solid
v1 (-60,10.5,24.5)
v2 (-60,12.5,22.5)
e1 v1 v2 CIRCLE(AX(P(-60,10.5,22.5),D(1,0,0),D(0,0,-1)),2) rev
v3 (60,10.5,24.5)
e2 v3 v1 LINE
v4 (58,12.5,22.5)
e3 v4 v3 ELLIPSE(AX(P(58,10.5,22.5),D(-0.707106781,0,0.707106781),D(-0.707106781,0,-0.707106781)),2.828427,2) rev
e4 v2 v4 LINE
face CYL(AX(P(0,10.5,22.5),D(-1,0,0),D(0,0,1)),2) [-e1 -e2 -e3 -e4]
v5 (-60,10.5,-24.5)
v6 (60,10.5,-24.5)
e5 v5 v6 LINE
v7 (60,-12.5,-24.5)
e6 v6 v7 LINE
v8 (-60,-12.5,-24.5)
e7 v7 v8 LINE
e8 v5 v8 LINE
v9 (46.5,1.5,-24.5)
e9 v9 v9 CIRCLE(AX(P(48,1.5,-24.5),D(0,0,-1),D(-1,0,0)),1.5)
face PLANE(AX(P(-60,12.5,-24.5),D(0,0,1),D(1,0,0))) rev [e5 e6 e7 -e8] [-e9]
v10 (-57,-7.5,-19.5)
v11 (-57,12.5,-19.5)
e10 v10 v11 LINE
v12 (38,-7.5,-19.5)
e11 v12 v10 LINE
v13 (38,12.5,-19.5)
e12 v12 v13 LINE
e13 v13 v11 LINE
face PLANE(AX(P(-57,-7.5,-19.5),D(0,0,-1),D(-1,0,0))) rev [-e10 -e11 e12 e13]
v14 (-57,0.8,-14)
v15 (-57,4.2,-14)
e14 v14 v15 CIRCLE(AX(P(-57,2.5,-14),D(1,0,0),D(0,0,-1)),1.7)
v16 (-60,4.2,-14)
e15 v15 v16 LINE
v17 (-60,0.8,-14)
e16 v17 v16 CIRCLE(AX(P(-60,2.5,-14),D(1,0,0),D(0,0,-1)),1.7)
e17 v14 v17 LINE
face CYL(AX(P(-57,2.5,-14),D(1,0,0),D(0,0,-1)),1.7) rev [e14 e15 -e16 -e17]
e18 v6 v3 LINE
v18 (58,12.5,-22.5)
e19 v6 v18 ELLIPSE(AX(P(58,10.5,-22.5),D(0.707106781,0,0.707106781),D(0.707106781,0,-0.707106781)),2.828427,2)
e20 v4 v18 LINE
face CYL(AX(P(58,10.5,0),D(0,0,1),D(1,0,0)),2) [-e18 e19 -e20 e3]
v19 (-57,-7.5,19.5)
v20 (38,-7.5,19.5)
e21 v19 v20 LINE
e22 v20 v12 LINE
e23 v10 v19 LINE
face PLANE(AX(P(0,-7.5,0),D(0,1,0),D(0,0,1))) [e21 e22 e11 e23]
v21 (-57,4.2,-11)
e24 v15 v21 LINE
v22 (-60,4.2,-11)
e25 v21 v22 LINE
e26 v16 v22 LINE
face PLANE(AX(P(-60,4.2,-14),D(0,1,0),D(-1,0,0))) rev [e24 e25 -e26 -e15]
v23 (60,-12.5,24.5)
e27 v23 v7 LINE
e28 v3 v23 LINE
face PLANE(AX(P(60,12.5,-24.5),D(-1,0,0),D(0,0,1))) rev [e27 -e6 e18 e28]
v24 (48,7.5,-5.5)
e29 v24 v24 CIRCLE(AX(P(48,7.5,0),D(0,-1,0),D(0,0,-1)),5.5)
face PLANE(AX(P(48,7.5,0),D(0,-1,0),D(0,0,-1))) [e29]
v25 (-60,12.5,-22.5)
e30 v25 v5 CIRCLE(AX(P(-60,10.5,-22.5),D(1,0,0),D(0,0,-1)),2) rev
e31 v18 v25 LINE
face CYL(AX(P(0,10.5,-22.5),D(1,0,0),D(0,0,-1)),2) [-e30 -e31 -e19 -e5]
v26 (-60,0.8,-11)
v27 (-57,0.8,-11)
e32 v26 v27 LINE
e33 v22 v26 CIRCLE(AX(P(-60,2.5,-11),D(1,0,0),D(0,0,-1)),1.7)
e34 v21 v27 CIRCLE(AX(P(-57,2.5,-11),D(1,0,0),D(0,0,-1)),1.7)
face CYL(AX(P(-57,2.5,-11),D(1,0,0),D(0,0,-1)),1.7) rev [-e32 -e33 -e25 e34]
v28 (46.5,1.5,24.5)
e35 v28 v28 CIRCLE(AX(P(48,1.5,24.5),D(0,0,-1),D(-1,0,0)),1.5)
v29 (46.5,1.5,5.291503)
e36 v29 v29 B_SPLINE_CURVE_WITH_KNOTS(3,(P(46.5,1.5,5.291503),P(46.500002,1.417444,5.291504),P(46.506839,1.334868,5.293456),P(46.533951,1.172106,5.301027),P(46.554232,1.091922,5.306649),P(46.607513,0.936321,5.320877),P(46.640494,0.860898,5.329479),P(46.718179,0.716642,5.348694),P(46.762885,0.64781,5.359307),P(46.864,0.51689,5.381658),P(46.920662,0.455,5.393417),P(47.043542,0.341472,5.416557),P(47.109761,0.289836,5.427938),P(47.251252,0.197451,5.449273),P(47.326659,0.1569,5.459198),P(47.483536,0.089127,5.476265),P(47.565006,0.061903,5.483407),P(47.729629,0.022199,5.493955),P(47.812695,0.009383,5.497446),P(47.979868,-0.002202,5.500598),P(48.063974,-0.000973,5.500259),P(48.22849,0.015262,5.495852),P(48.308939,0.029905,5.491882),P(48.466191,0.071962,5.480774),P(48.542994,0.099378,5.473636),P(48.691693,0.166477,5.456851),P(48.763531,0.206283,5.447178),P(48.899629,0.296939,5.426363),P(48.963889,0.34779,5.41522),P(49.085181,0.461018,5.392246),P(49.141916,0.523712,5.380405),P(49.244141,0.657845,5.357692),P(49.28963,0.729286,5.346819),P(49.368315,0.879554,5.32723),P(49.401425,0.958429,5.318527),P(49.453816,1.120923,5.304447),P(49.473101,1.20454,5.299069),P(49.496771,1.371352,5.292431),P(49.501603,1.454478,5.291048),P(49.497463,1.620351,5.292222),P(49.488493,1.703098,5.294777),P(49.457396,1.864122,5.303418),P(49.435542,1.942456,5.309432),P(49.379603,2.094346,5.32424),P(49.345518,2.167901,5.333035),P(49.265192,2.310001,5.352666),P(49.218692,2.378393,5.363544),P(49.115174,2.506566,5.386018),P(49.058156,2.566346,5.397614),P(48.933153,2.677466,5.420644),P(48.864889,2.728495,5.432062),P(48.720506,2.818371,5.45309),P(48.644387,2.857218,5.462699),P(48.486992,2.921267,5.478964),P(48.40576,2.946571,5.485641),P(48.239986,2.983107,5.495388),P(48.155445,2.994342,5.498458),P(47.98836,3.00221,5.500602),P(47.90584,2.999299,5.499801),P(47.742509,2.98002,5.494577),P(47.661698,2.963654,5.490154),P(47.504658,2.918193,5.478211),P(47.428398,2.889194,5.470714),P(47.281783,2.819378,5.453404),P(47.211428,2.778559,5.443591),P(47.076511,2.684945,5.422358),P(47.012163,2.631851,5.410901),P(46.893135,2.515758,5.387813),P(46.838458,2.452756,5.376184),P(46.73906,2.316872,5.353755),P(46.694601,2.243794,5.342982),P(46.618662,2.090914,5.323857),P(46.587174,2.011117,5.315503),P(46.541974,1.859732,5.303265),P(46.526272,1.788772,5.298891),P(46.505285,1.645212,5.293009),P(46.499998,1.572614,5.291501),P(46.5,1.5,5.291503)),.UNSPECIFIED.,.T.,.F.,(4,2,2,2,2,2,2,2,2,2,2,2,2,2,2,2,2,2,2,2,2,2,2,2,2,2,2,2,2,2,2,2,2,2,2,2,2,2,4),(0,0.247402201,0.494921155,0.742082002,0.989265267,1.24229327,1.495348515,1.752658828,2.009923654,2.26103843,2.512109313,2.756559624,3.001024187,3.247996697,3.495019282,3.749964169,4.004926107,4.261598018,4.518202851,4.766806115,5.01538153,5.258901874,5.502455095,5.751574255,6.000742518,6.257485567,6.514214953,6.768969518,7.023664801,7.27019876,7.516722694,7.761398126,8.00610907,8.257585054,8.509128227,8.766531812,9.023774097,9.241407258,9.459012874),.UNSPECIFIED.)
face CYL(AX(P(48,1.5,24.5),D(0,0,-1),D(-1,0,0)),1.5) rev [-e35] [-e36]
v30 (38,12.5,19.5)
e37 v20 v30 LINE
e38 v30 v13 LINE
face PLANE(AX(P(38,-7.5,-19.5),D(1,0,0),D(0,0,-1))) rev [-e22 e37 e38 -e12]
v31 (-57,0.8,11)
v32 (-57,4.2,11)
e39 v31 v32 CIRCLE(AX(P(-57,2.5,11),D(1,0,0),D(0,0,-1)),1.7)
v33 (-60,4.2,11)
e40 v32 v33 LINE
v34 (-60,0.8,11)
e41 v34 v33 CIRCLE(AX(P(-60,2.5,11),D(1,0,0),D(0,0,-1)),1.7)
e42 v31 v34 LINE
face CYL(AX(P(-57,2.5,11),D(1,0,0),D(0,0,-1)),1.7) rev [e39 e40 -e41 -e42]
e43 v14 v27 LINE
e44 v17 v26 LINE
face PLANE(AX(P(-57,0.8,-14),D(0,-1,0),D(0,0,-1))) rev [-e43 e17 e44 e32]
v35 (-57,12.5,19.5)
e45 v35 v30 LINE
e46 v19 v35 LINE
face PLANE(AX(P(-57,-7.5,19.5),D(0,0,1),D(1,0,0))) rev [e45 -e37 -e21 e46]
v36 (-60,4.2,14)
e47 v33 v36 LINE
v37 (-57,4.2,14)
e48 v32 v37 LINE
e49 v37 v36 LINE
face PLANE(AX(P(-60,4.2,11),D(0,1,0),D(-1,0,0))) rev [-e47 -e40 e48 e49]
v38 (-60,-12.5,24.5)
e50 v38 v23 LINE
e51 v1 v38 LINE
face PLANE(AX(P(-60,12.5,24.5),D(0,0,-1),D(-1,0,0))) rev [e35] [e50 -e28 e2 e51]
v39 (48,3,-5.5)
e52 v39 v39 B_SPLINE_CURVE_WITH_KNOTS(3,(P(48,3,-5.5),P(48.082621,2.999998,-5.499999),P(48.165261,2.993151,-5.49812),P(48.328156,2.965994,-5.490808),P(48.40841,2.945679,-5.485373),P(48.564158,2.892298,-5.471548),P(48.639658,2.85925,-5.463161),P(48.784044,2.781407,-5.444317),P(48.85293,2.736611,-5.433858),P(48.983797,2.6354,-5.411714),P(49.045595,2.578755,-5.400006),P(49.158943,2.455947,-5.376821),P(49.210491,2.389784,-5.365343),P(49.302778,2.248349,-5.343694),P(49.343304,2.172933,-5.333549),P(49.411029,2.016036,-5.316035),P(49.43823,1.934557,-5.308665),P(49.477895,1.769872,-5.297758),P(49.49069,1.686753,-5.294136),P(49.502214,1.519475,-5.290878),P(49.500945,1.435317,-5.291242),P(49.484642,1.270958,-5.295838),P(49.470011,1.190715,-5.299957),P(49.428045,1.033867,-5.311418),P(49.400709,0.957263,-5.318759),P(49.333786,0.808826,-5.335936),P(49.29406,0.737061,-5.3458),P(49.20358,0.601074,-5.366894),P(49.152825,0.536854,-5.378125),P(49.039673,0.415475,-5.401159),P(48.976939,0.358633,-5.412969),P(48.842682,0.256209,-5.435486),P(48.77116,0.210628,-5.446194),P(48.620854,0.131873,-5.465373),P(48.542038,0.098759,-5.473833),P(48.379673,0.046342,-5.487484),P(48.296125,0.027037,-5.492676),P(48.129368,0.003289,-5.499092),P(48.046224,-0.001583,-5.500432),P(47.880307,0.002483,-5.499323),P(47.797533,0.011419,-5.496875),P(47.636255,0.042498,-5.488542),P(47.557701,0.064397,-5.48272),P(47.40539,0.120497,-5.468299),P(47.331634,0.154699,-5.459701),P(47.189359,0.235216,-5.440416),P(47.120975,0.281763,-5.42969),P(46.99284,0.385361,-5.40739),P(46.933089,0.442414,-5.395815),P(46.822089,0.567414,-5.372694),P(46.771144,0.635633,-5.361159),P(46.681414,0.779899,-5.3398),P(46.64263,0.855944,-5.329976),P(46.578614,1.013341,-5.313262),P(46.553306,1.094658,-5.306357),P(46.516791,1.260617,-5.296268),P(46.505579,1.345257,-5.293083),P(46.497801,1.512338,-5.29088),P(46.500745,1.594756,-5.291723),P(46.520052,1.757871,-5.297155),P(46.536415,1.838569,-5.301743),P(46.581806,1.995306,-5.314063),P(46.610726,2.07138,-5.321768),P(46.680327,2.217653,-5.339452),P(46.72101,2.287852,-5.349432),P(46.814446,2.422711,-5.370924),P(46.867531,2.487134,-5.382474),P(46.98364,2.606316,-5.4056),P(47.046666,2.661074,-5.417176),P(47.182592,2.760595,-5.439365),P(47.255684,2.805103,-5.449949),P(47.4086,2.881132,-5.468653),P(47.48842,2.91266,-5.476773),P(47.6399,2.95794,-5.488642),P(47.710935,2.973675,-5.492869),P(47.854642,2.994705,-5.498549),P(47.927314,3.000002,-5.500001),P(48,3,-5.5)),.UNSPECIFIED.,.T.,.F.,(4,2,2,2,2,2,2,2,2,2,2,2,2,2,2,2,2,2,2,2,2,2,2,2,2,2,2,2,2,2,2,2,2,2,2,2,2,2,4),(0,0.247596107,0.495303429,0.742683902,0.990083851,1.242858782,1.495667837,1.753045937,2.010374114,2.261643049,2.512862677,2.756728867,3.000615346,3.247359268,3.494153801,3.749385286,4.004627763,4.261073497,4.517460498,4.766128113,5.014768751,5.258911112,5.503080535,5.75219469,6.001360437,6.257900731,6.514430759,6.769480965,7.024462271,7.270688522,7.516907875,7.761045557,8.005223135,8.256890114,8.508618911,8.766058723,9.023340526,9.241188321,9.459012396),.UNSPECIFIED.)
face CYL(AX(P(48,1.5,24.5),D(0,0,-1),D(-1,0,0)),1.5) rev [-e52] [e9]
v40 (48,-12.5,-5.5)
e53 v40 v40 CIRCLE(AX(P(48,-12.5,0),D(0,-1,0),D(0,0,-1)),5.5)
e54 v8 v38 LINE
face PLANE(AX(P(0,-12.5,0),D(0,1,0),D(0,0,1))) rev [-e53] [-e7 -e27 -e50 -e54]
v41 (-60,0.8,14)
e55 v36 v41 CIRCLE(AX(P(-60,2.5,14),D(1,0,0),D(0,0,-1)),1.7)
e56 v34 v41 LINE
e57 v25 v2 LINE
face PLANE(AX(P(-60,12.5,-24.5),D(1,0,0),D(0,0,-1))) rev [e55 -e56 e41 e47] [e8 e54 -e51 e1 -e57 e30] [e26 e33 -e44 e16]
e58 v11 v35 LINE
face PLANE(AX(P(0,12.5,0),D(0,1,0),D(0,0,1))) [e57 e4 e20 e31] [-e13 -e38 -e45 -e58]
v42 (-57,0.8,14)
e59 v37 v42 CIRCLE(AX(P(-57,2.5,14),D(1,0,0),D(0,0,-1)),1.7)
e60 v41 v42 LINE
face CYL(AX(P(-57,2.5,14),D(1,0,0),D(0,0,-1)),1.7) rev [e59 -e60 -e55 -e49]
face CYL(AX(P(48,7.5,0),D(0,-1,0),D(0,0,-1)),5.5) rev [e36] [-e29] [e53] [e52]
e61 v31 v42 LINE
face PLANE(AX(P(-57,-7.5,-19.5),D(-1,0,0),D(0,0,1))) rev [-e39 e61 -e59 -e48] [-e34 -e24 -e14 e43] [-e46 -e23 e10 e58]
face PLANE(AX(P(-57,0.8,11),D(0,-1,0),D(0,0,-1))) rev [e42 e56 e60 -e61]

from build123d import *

# Parameters (mm, degrees)
SKETCH1_W                = 120
SKETCH1_H                = 49
BOSS_EXTRUDE1_DEPTH      = 12.5
SKETCH2_W                = 95
SKETCH2_H                = 39
CUT_EXTRUDE1_DEPTH       = 20
FILLET1_R                = 2
M3_START                 = -60
M3_CLEARANCE_SLOT1_DEPTH = 3
SKETCH6_R                = 5.5
CUT_EXTRUDE2_DEPTH       = 20
SKETCH7_R                = 1.5
CUT_EXTRUDE3_DEPTH       = 79.468146403


# Read off the part's stored shape, not the designer's step: M3 Clearance Slot1
with BuildPart() as part:
    # Sketch1 → Boss-Extrude1 (new, symmetric)
    with BuildSketch(Plane(origin=(0, 0, 0), x_dir=(1, 0, 0), z_dir=(0, 1, 0))):
        Rectangle(SKETCH1_W, SKETCH1_H)
    extrude(amount=BOSS_EXTRUDE1_DEPTH, both=True)

    # Sketch2 → Cut-Extrude1 (cut)
    with BuildSketch(Plane(origin=(0, 12.5, 0), x_dir=(1, 0, 0), z_dir=(0, 1, 0))):
        with Locations((-9.5, 0)):
            Rectangle(SKETCH2_W, SKETCH2_H)
    extrude(amount=-CUT_EXTRUDE1_DEPTH, mode=Mode.SUBTRACT)

    # Fillet1
    fillet1_edges = [part.edges().sort_by_distance(p)[0] for p in [
        (0, 12.5, 24.5),
        (60, 12.5, 0),
        (0, 12.5, -24.5),
    ]]
    fillet(fillet1_edges, radius=FILLET1_R)

    # M3 Clearance Slot1 outline → M3 Clearance Slot1 (cut)
    with BuildSketch(Plane.YZ.offset(M3_START)):
        with BuildLine():
            Line((4.2, -14), (4.2, -11))
            ThreePointArc((4.2, -11), (2.5, -9.3), (0.8, -11))
            Line((0.8, -11), (0.8, -14))
            ThreePointArc((0.8, -14), (2.5, -15.7), (4.2, -14))
        make_face()
        with BuildLine():
            ThreePointArc((4.2, 14), (2.5, 15.7), (0.8, 14))
            Line((0.8, 14), (0.8, 11))
            ThreePointArc((0.8, 11), (2.5, 9.3), (4.2, 11))
            Line((4.2, 11), (4.2, 14))
        make_face()
    extrude(amount=M3_CLEARANCE_SLOT1_DEPTH, mode=Mode.SUBTRACT)

    # Sketch6 → Cut-Extrude2 (cut)
    with BuildSketch(Plane.XZ.offset(12.5)):
        with Locations(Location((48, 0, 0), (0, 0, 270))):
            Circle(SKETCH6_R)
    extrude(amount=-CUT_EXTRUDE2_DEPTH, mode=Mode.SUBTRACT)

    # Sketch7 → Cut-Extrude3 (cut, through all)
    with BuildSketch(Plane(origin=(0, 0, -24.5), x_dir=(-1, 0, 0), z_dir=(0, 0, -1))):
        with Locations((-48, 1.5)):
            Circle(SKETCH7_R)
    extrude(amount=-CUT_EXTRUDE3_DEPTH, mode=Mode.SUBTRACT)


solid = part.part
